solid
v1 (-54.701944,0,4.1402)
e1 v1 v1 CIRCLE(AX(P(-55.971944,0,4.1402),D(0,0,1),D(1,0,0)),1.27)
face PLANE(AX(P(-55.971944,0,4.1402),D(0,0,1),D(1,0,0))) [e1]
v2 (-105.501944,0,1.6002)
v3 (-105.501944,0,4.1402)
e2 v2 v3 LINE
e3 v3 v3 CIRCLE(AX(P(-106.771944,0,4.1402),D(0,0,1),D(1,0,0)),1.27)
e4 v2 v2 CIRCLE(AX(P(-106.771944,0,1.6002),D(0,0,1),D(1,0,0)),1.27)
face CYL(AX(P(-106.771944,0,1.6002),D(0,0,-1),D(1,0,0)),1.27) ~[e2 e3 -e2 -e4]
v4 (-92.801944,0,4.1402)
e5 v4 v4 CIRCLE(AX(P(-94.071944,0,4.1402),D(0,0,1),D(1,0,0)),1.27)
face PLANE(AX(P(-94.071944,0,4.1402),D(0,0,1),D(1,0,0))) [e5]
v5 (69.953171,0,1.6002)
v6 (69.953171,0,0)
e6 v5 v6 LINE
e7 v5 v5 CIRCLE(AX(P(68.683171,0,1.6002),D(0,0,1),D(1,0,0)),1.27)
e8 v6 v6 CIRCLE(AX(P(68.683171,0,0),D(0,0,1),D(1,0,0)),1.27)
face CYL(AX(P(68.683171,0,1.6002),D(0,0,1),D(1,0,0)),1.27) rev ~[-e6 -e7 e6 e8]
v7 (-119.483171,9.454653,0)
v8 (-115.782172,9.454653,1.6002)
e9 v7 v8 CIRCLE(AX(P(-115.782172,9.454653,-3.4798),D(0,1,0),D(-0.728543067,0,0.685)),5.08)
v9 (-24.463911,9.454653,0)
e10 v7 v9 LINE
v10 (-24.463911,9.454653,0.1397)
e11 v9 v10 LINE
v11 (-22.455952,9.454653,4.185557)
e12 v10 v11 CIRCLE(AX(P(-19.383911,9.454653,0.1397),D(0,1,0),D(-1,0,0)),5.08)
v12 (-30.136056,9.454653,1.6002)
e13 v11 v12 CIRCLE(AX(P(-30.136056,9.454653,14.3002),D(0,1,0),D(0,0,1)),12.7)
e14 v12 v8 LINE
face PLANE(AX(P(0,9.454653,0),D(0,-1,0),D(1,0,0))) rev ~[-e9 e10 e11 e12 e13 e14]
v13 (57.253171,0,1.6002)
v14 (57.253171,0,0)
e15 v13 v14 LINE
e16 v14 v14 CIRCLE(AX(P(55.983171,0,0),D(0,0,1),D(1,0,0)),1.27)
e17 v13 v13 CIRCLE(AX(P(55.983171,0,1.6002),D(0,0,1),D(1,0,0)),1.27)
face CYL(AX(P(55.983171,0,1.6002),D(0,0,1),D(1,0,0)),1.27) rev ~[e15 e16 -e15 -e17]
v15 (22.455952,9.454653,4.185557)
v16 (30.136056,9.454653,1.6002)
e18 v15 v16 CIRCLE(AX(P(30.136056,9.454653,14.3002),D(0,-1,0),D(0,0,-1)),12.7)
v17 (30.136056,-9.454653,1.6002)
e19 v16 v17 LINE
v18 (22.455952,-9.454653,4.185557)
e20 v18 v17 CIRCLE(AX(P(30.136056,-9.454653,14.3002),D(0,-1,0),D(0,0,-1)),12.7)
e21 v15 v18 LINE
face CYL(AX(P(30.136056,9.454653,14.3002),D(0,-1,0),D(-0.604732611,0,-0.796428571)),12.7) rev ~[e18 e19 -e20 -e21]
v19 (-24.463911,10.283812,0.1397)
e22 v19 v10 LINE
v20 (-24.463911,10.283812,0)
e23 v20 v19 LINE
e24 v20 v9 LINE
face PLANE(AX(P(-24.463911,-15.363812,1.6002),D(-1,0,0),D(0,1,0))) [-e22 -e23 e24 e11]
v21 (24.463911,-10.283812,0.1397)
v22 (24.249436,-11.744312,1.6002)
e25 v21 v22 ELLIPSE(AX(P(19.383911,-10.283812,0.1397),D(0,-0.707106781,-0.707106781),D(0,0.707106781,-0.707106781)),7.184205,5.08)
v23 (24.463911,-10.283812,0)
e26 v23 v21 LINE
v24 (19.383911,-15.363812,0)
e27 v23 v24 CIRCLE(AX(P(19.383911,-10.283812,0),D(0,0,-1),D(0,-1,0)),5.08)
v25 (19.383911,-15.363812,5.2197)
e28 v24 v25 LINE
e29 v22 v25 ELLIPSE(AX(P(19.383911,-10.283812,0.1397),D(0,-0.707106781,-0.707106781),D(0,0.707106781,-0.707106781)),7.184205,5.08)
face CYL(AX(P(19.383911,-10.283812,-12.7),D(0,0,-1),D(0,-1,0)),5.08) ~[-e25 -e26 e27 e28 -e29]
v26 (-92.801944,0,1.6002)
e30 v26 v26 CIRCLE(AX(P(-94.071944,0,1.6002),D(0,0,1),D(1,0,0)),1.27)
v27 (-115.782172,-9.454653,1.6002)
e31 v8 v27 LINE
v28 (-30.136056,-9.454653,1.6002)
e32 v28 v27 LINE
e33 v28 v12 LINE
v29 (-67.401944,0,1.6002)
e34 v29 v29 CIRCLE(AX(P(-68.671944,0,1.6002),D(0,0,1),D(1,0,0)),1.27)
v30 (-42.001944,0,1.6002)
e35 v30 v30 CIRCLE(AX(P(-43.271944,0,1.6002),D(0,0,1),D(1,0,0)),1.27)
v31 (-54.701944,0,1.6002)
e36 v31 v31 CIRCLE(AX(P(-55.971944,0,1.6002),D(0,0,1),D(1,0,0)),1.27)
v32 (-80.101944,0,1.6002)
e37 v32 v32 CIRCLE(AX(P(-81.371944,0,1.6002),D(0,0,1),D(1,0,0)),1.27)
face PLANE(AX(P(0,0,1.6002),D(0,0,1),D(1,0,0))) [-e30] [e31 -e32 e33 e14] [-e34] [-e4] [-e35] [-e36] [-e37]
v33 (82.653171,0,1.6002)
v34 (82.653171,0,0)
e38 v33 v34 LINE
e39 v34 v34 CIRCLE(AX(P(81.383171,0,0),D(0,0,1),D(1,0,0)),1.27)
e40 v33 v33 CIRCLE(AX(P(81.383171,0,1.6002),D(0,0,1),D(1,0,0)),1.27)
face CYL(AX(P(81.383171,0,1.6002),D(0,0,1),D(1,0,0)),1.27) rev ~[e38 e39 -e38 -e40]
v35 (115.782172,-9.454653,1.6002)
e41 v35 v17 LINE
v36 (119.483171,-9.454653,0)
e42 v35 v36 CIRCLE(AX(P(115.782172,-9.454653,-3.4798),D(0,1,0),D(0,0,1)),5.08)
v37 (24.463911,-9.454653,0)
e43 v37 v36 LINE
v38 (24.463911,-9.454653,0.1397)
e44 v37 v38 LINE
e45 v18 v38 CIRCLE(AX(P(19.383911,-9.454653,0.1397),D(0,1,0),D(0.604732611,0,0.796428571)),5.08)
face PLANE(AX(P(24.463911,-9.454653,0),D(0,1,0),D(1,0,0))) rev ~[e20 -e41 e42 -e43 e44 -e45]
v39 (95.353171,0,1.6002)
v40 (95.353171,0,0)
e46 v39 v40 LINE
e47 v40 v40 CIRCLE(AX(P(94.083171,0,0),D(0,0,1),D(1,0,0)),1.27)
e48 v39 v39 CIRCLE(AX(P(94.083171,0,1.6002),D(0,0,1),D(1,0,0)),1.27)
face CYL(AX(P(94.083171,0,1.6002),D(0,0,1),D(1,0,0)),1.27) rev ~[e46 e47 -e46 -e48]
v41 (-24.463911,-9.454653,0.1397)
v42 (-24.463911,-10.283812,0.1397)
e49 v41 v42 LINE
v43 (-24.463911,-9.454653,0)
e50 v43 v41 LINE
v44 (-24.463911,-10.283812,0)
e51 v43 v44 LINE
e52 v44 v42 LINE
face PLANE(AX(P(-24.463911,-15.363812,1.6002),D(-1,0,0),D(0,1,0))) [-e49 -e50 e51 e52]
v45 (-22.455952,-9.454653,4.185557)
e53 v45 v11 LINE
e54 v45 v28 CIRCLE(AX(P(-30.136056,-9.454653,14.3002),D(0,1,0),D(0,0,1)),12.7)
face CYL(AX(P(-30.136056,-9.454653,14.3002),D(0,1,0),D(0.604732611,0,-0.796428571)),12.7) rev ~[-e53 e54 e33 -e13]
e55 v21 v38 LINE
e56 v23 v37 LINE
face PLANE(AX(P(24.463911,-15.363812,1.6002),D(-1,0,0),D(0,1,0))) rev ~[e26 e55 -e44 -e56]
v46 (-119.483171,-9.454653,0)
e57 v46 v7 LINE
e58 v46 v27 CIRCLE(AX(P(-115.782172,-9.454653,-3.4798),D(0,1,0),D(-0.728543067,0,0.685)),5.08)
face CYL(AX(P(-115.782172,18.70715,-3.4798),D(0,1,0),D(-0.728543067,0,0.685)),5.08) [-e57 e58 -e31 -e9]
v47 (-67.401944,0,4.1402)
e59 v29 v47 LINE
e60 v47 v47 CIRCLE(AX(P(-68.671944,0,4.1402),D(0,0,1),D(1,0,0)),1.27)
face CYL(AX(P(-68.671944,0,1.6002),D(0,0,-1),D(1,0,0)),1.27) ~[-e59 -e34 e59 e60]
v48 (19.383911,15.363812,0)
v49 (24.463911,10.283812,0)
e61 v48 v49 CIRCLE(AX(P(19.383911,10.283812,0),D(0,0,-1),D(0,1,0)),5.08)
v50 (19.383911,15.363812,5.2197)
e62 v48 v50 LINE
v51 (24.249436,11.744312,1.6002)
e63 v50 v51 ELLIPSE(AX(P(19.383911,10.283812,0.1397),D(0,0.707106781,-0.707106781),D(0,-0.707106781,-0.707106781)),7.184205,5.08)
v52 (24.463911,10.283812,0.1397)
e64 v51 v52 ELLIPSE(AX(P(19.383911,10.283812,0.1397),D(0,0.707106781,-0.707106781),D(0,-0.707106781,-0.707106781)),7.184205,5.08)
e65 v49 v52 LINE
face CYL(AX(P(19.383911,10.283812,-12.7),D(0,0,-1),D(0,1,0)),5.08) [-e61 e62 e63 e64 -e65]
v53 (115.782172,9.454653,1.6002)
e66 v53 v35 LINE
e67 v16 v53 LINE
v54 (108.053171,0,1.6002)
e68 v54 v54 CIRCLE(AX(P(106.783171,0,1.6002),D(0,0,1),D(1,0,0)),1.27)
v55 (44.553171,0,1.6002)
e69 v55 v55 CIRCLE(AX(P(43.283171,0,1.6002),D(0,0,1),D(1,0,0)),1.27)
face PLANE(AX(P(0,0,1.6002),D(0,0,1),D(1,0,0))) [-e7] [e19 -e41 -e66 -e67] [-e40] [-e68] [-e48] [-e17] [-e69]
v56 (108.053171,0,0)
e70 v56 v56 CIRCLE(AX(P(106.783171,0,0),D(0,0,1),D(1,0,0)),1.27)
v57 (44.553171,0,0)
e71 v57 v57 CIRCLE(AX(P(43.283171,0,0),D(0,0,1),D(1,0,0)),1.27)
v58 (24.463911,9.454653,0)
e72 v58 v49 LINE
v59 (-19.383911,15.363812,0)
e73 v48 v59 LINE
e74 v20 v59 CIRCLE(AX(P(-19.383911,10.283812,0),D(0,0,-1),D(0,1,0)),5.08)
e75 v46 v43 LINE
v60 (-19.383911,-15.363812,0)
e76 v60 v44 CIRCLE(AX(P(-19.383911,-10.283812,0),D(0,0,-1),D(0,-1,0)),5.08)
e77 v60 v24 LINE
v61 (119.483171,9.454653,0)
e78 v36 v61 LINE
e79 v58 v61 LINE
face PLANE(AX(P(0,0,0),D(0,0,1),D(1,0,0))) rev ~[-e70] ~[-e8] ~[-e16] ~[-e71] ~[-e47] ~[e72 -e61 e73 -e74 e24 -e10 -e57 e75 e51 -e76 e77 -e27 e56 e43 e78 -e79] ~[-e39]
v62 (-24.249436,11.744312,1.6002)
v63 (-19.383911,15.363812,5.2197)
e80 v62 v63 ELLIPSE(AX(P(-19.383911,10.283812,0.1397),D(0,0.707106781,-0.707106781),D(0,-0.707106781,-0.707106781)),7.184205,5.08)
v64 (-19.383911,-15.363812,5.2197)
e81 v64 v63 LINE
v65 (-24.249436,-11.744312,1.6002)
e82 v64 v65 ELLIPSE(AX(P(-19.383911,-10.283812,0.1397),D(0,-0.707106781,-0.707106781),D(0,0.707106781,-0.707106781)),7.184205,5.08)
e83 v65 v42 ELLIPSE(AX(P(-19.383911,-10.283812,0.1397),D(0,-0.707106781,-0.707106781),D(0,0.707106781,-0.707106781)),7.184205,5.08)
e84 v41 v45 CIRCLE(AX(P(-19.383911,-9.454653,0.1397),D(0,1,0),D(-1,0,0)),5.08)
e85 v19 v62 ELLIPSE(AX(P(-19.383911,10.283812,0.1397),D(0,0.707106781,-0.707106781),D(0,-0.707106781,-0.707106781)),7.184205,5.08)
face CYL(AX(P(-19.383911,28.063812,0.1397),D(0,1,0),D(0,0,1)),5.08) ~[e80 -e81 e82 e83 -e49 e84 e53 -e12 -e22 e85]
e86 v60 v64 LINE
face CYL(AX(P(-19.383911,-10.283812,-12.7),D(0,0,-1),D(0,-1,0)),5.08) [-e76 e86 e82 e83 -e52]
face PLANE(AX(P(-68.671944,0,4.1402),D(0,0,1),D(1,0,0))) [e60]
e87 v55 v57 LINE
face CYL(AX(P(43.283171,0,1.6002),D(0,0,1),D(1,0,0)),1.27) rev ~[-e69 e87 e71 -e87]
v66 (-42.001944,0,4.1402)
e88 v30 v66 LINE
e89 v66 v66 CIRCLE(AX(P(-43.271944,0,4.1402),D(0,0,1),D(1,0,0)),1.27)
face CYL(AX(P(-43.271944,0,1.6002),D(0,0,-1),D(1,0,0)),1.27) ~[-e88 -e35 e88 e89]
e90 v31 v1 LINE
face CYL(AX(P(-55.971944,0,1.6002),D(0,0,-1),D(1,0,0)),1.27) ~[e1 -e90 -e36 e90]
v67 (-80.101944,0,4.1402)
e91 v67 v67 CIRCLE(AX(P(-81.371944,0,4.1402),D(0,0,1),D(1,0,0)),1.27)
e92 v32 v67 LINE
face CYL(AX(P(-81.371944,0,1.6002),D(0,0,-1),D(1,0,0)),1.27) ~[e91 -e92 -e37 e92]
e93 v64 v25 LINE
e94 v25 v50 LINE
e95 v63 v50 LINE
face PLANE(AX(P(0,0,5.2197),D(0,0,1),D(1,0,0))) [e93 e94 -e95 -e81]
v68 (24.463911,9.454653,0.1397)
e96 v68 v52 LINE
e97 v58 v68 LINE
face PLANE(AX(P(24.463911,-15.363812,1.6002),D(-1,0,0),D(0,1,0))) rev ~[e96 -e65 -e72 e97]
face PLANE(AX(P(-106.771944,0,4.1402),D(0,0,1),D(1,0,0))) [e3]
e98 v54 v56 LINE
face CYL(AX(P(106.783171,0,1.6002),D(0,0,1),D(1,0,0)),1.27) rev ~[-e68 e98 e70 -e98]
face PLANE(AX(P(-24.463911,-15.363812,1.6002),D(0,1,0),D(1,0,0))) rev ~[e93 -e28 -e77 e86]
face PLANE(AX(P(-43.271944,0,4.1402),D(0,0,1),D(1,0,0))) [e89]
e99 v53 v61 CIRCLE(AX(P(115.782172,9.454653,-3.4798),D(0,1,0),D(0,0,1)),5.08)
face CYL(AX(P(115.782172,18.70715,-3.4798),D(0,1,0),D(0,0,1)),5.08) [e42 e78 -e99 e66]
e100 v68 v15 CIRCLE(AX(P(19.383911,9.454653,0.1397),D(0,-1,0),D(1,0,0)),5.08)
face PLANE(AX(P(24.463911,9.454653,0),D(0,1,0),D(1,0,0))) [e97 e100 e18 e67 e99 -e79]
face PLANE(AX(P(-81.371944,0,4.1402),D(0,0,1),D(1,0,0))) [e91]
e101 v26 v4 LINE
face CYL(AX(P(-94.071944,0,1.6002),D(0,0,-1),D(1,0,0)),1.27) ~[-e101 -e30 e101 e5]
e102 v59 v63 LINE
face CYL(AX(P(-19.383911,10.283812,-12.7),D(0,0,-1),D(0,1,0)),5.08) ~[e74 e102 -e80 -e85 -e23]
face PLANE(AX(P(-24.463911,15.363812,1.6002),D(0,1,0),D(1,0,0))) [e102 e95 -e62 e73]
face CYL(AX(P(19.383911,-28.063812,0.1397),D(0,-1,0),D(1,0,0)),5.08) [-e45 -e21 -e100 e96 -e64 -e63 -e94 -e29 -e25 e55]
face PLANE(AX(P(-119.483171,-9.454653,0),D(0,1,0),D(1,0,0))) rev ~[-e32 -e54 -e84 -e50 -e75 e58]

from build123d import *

# Parameters (mm, degrees)
F0_W         = 95.0192604214
F0_H         = 18.9093053341
F1_DEPTH     = 1.6002
F2_R         = 1.27
F3_DEPTH     = 25.4
F4_R         = 1.27
F5_DEPTH     = 2.54
F6_W         = 48.927821219
F6_H         = 30.7276230305
F7_DEPTH     = 3.6195
F8_T1_DEPTH  = 30.6197
F8_T6_DEPTH  = 56.1276230305
F8_T12_DEPTH = 56.1276230305
F8_T18_DEPTH = 56.1276230305
F8_T25_DEPTH = 56.1276230305
F8_T31_DEPTH = 56.1276230305
F8_T37_DEPTH = 56.1276230305
F8_T43_DEPTH = 56.1276230305
F8_T49_DEPTH = 56.1276230305
F8_T56_DEPTH = 56.1276230305
F8_T62_DEPTH = 56.1276230305
F9_T1_DEPTH  = 37.4142992276
F10_R        = 12.7


# Not quite as in the source:
# - a fillet or chamfer that OpenCascade refuses, or shapes differently, is made with other operations: its cross-section is extruded or revolved along the edge and cut away or added


with BuildPart() as f1:
    # F0 (on Top) → F1 (new body)
    with BuildSketch(Plane.XY):
        Polygon((-24.4639106095, -15.3638115153), (24.4639106095, -15.3638115153), (24.4639106095, -9.454652667), (24.4639106095, 9.454652667), (24.4639106095, 15.3638115153), (-24.4639106095, 15.3638115153), (-24.4639106095, 9.454652667), (-24.4639106095, -9.454652667), align=None)
        with Locations((71.9735408202, 0)):
            Rectangle(F0_W, F0_H)
        with Locations((-71.9735408202, 0)):
            Rectangle(F0_W, F0_H)
    extrude(amount=F1_DEPTH)

    # F2 (on face) → F3 (cut)
    with BuildSketch(Plane.XY.offset(1.6002)):
        with Locations((106.7831710309, 0)):
            Circle(F2_R)
        with Locations((94.0831710309, 0)):
            Circle(F2_R)
        with Locations((81.3831710309, 0)):
            Circle(F2_R)
        with Locations((68.6831710309, 0)):
            Circle(F2_R)
        with Locations((55.9831710309, 0)):
            Circle(F2_R)
        with Locations((43.2831710309, 0)):
            Circle(F2_R)
    extrude(amount=-F3_DEPTH, mode=Mode.SUBTRACT)

    # F4 (on face) → F5 (join)
    with BuildSketch(Plane.XY.offset(1.6002)):
        with Locations((-106.7719441229, 0)):
            Circle(F4_R)
        with Locations((-94.0719441229, 0)):
            Circle(F4_R)
        with Locations((-81.3719441229, 0)):
            Circle(F4_R)
        with Locations((-68.6719441229, 0)):
            Circle(F4_R)
        with Locations((-55.9719441229, 0)):
            Circle(F4_R)
        with Locations((-43.2719441229, 0)):
            Circle(F4_R)
    extrude(amount=F5_DEPTH)

    # F6 (on face) → F7 (join)
    with BuildSketch(Plane.XY.offset(1.6002)):
        Rectangle(F6_W, F6_H)
    extrude(amount=F7_DEPTH)

    # F8: fillet of radius 5.08 on 6 edges, made by hand

    # F8_s2 → F8_t1 (cut)
    with BuildSketch(Plane.XY.offset(-12.7)):
        with BuildLine():
            ThreePointArc((-19.3839106095, 15.3638115153), (-22.9760130579, 13.8759139637), (-24.4639106095, 10.2838115153))
            Line((-24.4639106095, 10.2838115153), (-24.4639106095, 15.3638115153))
            Line((-24.4639106095, 15.3638115153), (-19.3839106095, 15.3638115153))
        make_face()
        with BuildLine():
            ThreePointArc((-19.3839106095, -15.3638115153), (-22.9760130579, -13.8759139637), (-24.4639106095, -10.2838115153))
            Line((-24.4639106095, -10.2838115153), (-24.4639106095, -15.3638115153))
            Line((-24.4639106095, -15.3638115153), (-19.3839106095, -15.3638115153))
        make_face()
        with BuildLine():
            ThreePointArc((19.3839106095, -15.3638115153), (22.9760130579, -13.8759139637), (24.4639106095, -10.2838115153))
            Line((24.4639106095, -10.2838115153), (24.4639106095, -15.3638115153))
            Line((24.4639106095, -15.3638115153), (19.3839106095, -15.3638115153))
        make_face()
        with BuildLine():
            ThreePointArc((19.3839106095, 15.3638115153), (22.9760130579, 13.8759139637), (24.4639106095, 10.2838115153))
            Line((24.4639106095, 10.2838115153), (24.4639106095, 15.3638115153))
            Line((24.4639106095, 15.3638115153), (19.3839106095, 15.3638115153))
        make_face()
    extrude(amount=F8_T1_DEPTH, mode=Mode.SUBTRACT)


with BuildPart() as f8_tool4:
    # F8_s5 → F8_t6 (new body)
    with BuildSketch(Plane.XZ.offset(28.0638115153)):
        with BuildLine():
            ThreePointArc((24.4639106095, 0.1397), (22.9760130579, 3.7318024484), (19.3839106095, 5.2197))
            Line((19.3839106095, 5.2197), (24.4639106095, 5.2197))
            Line((24.4639106095, 5.2197), (24.4639106095, 0.1397))
        make_face()
    extrude(amount=-F8_T6_DEPTH)

    split(bisect_by=Plane.XY.offset(1.6002), keep=Keep.BOTTOM)

    split(bisect_by=Plane.XZ.offset(9.454652667), keep=Keep.TOP)


with BuildPart() as f1_1:
    add(f1.part)

    # F8_t3: cut F8_tool4
    add(f8_tool4.part, mode=Mode.SUBTRACT)


with BuildPart() as f8_tool10:
    # F8_s11 → F8_t12 (new body)
    with BuildSketch(Plane.XZ.offset(28.0638115153)):
        with BuildLine():
            ThreePointArc((24.4639106095, 0.1397), (22.9760130579, 3.7318024484), (19.3839106095, 5.2197))
            Line((19.3839106095, 5.2197), (24.4639106095, 5.2197))
            Line((24.4639106095, 5.2197), (24.4639106095, 0.1397))
        make_face()
    extrude(amount=-F8_T12_DEPTH)

    split(bisect_by=Plane.XY.offset(1.6002), keep=Keep.TOP)

    split(bisect_by=Plane.XZ.offset(9.454652667), keep=Keep.TOP)


with BuildPart() as f1_2:
    add(f1_1.part)

    # F8_t9: cut F8_tool10
    add(f8_tool10.part, mode=Mode.SUBTRACT)


with BuildPart() as f8_tool16:
    # F8_s17 → F8_t18 (new body)
    with BuildSketch(Plane.XZ.offset(28.0638115153)):
        with BuildLine():
            ThreePointArc((24.4639106095, 0.1397), (22.9760130579, 3.7318024484), (19.3839106095, 5.2197))
            Line((19.3839106095, 5.2197), (24.4639106095, 5.2197))
            Line((24.4639106095, 5.2197), (24.4639106095, 0.1397))
        make_face()
    extrude(amount=-F8_T18_DEPTH)

    split(bisect_by=Plane.XY.offset(1.6002), keep=Keep.TOP)

    split(bisect_by=Plane.XZ.offset(-9.454652667), keep=Keep.TOP)

    split(bisect_by=Plane.XZ.offset(9.454652667), keep=Keep.BOTTOM)


with BuildPart() as f1_3:
    add(f1_2.part)

    # F8_t15: cut F8_tool16
    add(f8_tool16.part, mode=Mode.SUBTRACT)


with BuildPart() as f8_tool23:
    # F8_s24 → F8_t25 (new body)
    with BuildSketch(Plane.XZ.offset(28.0638115153)):
        with BuildLine():
            ThreePointArc((24.4639106095, 0.1397), (22.9760130579, 3.7318024484), (19.3839106095, 5.2197))
            Line((19.3839106095, 5.2197), (24.4639106095, 5.2197))
            Line((24.4639106095, 5.2197), (24.4639106095, 0.1397))
        make_face()
    extrude(amount=-F8_T25_DEPTH)

    split(bisect_by=Plane.XY.offset(1.6002), keep=Keep.BOTTOM)

    split(bisect_by=Plane.XZ.offset(-9.454652667), keep=Keep.BOTTOM)


with BuildPart() as f1_4:
    add(f1_3.part)

    # F8_t22: cut F8_tool23
    add(f8_tool23.part, mode=Mode.SUBTRACT)


with BuildPart() as f8_tool29:
    # F8_s30 → F8_t31 (new body)
    with BuildSketch(Plane.XZ.offset(28.0638115153)):
        with BuildLine():
            ThreePointArc((24.4639106095, 0.1397), (22.9760130579, 3.7318024484), (19.3839106095, 5.2197))
            Line((19.3839106095, 5.2197), (24.4639106095, 5.2197))
            Line((24.4639106095, 5.2197), (24.4639106095, 0.1397))
        make_face()
    extrude(amount=-F8_T31_DEPTH)

    split(bisect_by=Plane.XY.offset(1.6002), keep=Keep.TOP)

    split(bisect_by=Plane.XZ.offset(-9.454652667), keep=Keep.BOTTOM)


with BuildPart() as f1_5:
    add(f1_4.part)

    # F8_t28: cut F8_tool29
    add(f8_tool29.part, mode=Mode.SUBTRACT)


with BuildPart() as f8_tool35:
    # F8_s36 → F8_t37 (new body)
    with BuildSketch(Plane.XZ.offset(-28.0638115153)):
        with BuildLine():
            ThreePointArc((-19.3839106095, 5.2197), (-22.9760130579, 3.7318024484), (-24.4639106095, 0.1397))
            Line((-24.4639106095, 0.1397), (-24.4639106095, 5.2197))
            Line((-24.4639106095, 5.2197), (-19.3839106095, 5.2197))
        make_face()
    extrude(amount=F8_T37_DEPTH)

    split(bisect_by=Plane.XZ.offset(-9.454652667), keep=Keep.BOTTOM)

    split(bisect_by=Plane.XY.offset(1.6002), keep=Keep.TOP)


with BuildPart() as f1_6:
    add(f1_5.part)

    # F8_t34: cut F8_tool35
    add(f8_tool35.part, mode=Mode.SUBTRACT)


with BuildPart() as f8_tool41:
    # F8_s42 → F8_t43 (new body)
    with BuildSketch(Plane.XZ.offset(-28.0638115153)):
        with BuildLine():
            ThreePointArc((-19.3839106095, 5.2197), (-22.9760130579, 3.7318024484), (-24.4639106095, 0.1397))
            Line((-24.4639106095, 0.1397), (-24.4639106095, 5.2197))
            Line((-24.4639106095, 5.2197), (-19.3839106095, 5.2197))
        make_face()
    extrude(amount=F8_T43_DEPTH)

    split(bisect_by=Plane.XZ.offset(-9.454652667), keep=Keep.BOTTOM)

    split(bisect_by=Plane.XY.offset(1.6002), keep=Keep.BOTTOM)


with BuildPart() as f1_7:
    add(f1_6.part)

    # F8_t40: cut F8_tool41
    add(f8_tool41.part, mode=Mode.SUBTRACT)


with BuildPart() as f8_tool47:
    # F8_s48 → F8_t49 (new body)
    with BuildSketch(Plane.XZ.offset(-28.0638115153)):
        with BuildLine():
            ThreePointArc((-19.3839106095, 5.2197), (-22.9760130579, 3.7318024484), (-24.4639106095, 0.1397))
            Line((-24.4639106095, 0.1397), (-24.4639106095, 5.2197))
            Line((-24.4639106095, 5.2197), (-19.3839106095, 5.2197))
        make_face()
    extrude(amount=F8_T49_DEPTH)

    split(bisect_by=Plane.XZ.offset(-9.454652667), keep=Keep.TOP)

    split(bisect_by=Plane.XY.offset(1.6002), keep=Keep.TOP)

    split(bisect_by=Plane.XZ.offset(9.454652667), keep=Keep.BOTTOM)


with BuildPart() as f1_8:
    add(f1_7.part)

    # F8_t46: cut F8_tool47
    add(f8_tool47.part, mode=Mode.SUBTRACT)


with BuildPart() as f8_tool54:
    # F8_s55 → F8_t56 (new body)
    with BuildSketch(Plane.XZ.offset(-28.0638115153)):
        with BuildLine():
            ThreePointArc((-19.3839106095, 5.2197), (-22.9760130579, 3.7318024484), (-24.4639106095, 0.1397))
            Line((-24.4639106095, 0.1397), (-24.4639106095, 5.2197))
            Line((-24.4639106095, 5.2197), (-19.3839106095, 5.2197))
        make_face()
    extrude(amount=F8_T56_DEPTH)

    split(bisect_by=Plane.XY.offset(1.6002), keep=Keep.TOP)

    split(bisect_by=Plane.XZ.offset(9.454652667), keep=Keep.TOP)


with BuildPart() as f1_9:
    add(f1_8.part)

    # F8_t53: cut F8_tool54
    add(f8_tool54.part, mode=Mode.SUBTRACT)


with BuildPart() as f8_tool60:
    # F8_s61 → F8_t62 (new body)
    with BuildSketch(Plane.XZ.offset(-28.0638115153)):
        with BuildLine():
            ThreePointArc((-19.3839106095, 5.2197), (-22.9760130579, 3.7318024484), (-24.4639106095, 0.1397))
            Line((-24.4639106095, 0.1397), (-24.4639106095, 5.2197))
            Line((-24.4639106095, 5.2197), (-19.3839106095, 5.2197))
        make_face()
    extrude(amount=F8_T62_DEPTH)

    split(bisect_by=Plane.XY.offset(1.6002), keep=Keep.BOTTOM)

    split(bisect_by=Plane.XZ.offset(9.454652667), keep=Keep.TOP)


with BuildPart() as f1_10:
    add(f1_9.part)

    # F8_t59: cut F8_tool60
    add(f8_tool60.part, mode=Mode.SUBTRACT)

    # F9: fillet of radius 5.08 on 2 edges, made by hand

    # F9_s2 → F9_t1 (cut)
    with BuildSketch(Plane.XZ.offset(-18.7071496138)):
        with BuildLine():
            ThreePointArc((115.7821722522, 1.6002), (117.7982347512, 1.1830201767), (119.4831710309, 0))
            Line((119.4831710309, 0), (119.4831710309, 1.6002))
            Line((119.4831710309, 1.6002), (115.7821722522, 1.6002))
        make_face()
        with BuildLine():
            ThreePointArc((-119.4831710309, 0), (-117.7982347512, 1.1830201767), (-115.7821722522, 1.6002))
            Line((-115.7821722522, 1.6002), (-119.4831710309, 1.6002))
            Line((-119.4831710309, 1.6002), (-119.4831710309, 0))
        make_face()
    extrude(amount=F9_T1_DEPTH, mode=Mode.SUBTRACT)

    # F10
    f10_edges = [f1_10.edges().sort_by_distance(p)[0] for p in [
        (24.249436, 0, 1.6002),
        (-24.249436, 0, 1.6002),
    ]]
    fillet(f10_edges, radius=F10_R)


solid = f1_10.part
